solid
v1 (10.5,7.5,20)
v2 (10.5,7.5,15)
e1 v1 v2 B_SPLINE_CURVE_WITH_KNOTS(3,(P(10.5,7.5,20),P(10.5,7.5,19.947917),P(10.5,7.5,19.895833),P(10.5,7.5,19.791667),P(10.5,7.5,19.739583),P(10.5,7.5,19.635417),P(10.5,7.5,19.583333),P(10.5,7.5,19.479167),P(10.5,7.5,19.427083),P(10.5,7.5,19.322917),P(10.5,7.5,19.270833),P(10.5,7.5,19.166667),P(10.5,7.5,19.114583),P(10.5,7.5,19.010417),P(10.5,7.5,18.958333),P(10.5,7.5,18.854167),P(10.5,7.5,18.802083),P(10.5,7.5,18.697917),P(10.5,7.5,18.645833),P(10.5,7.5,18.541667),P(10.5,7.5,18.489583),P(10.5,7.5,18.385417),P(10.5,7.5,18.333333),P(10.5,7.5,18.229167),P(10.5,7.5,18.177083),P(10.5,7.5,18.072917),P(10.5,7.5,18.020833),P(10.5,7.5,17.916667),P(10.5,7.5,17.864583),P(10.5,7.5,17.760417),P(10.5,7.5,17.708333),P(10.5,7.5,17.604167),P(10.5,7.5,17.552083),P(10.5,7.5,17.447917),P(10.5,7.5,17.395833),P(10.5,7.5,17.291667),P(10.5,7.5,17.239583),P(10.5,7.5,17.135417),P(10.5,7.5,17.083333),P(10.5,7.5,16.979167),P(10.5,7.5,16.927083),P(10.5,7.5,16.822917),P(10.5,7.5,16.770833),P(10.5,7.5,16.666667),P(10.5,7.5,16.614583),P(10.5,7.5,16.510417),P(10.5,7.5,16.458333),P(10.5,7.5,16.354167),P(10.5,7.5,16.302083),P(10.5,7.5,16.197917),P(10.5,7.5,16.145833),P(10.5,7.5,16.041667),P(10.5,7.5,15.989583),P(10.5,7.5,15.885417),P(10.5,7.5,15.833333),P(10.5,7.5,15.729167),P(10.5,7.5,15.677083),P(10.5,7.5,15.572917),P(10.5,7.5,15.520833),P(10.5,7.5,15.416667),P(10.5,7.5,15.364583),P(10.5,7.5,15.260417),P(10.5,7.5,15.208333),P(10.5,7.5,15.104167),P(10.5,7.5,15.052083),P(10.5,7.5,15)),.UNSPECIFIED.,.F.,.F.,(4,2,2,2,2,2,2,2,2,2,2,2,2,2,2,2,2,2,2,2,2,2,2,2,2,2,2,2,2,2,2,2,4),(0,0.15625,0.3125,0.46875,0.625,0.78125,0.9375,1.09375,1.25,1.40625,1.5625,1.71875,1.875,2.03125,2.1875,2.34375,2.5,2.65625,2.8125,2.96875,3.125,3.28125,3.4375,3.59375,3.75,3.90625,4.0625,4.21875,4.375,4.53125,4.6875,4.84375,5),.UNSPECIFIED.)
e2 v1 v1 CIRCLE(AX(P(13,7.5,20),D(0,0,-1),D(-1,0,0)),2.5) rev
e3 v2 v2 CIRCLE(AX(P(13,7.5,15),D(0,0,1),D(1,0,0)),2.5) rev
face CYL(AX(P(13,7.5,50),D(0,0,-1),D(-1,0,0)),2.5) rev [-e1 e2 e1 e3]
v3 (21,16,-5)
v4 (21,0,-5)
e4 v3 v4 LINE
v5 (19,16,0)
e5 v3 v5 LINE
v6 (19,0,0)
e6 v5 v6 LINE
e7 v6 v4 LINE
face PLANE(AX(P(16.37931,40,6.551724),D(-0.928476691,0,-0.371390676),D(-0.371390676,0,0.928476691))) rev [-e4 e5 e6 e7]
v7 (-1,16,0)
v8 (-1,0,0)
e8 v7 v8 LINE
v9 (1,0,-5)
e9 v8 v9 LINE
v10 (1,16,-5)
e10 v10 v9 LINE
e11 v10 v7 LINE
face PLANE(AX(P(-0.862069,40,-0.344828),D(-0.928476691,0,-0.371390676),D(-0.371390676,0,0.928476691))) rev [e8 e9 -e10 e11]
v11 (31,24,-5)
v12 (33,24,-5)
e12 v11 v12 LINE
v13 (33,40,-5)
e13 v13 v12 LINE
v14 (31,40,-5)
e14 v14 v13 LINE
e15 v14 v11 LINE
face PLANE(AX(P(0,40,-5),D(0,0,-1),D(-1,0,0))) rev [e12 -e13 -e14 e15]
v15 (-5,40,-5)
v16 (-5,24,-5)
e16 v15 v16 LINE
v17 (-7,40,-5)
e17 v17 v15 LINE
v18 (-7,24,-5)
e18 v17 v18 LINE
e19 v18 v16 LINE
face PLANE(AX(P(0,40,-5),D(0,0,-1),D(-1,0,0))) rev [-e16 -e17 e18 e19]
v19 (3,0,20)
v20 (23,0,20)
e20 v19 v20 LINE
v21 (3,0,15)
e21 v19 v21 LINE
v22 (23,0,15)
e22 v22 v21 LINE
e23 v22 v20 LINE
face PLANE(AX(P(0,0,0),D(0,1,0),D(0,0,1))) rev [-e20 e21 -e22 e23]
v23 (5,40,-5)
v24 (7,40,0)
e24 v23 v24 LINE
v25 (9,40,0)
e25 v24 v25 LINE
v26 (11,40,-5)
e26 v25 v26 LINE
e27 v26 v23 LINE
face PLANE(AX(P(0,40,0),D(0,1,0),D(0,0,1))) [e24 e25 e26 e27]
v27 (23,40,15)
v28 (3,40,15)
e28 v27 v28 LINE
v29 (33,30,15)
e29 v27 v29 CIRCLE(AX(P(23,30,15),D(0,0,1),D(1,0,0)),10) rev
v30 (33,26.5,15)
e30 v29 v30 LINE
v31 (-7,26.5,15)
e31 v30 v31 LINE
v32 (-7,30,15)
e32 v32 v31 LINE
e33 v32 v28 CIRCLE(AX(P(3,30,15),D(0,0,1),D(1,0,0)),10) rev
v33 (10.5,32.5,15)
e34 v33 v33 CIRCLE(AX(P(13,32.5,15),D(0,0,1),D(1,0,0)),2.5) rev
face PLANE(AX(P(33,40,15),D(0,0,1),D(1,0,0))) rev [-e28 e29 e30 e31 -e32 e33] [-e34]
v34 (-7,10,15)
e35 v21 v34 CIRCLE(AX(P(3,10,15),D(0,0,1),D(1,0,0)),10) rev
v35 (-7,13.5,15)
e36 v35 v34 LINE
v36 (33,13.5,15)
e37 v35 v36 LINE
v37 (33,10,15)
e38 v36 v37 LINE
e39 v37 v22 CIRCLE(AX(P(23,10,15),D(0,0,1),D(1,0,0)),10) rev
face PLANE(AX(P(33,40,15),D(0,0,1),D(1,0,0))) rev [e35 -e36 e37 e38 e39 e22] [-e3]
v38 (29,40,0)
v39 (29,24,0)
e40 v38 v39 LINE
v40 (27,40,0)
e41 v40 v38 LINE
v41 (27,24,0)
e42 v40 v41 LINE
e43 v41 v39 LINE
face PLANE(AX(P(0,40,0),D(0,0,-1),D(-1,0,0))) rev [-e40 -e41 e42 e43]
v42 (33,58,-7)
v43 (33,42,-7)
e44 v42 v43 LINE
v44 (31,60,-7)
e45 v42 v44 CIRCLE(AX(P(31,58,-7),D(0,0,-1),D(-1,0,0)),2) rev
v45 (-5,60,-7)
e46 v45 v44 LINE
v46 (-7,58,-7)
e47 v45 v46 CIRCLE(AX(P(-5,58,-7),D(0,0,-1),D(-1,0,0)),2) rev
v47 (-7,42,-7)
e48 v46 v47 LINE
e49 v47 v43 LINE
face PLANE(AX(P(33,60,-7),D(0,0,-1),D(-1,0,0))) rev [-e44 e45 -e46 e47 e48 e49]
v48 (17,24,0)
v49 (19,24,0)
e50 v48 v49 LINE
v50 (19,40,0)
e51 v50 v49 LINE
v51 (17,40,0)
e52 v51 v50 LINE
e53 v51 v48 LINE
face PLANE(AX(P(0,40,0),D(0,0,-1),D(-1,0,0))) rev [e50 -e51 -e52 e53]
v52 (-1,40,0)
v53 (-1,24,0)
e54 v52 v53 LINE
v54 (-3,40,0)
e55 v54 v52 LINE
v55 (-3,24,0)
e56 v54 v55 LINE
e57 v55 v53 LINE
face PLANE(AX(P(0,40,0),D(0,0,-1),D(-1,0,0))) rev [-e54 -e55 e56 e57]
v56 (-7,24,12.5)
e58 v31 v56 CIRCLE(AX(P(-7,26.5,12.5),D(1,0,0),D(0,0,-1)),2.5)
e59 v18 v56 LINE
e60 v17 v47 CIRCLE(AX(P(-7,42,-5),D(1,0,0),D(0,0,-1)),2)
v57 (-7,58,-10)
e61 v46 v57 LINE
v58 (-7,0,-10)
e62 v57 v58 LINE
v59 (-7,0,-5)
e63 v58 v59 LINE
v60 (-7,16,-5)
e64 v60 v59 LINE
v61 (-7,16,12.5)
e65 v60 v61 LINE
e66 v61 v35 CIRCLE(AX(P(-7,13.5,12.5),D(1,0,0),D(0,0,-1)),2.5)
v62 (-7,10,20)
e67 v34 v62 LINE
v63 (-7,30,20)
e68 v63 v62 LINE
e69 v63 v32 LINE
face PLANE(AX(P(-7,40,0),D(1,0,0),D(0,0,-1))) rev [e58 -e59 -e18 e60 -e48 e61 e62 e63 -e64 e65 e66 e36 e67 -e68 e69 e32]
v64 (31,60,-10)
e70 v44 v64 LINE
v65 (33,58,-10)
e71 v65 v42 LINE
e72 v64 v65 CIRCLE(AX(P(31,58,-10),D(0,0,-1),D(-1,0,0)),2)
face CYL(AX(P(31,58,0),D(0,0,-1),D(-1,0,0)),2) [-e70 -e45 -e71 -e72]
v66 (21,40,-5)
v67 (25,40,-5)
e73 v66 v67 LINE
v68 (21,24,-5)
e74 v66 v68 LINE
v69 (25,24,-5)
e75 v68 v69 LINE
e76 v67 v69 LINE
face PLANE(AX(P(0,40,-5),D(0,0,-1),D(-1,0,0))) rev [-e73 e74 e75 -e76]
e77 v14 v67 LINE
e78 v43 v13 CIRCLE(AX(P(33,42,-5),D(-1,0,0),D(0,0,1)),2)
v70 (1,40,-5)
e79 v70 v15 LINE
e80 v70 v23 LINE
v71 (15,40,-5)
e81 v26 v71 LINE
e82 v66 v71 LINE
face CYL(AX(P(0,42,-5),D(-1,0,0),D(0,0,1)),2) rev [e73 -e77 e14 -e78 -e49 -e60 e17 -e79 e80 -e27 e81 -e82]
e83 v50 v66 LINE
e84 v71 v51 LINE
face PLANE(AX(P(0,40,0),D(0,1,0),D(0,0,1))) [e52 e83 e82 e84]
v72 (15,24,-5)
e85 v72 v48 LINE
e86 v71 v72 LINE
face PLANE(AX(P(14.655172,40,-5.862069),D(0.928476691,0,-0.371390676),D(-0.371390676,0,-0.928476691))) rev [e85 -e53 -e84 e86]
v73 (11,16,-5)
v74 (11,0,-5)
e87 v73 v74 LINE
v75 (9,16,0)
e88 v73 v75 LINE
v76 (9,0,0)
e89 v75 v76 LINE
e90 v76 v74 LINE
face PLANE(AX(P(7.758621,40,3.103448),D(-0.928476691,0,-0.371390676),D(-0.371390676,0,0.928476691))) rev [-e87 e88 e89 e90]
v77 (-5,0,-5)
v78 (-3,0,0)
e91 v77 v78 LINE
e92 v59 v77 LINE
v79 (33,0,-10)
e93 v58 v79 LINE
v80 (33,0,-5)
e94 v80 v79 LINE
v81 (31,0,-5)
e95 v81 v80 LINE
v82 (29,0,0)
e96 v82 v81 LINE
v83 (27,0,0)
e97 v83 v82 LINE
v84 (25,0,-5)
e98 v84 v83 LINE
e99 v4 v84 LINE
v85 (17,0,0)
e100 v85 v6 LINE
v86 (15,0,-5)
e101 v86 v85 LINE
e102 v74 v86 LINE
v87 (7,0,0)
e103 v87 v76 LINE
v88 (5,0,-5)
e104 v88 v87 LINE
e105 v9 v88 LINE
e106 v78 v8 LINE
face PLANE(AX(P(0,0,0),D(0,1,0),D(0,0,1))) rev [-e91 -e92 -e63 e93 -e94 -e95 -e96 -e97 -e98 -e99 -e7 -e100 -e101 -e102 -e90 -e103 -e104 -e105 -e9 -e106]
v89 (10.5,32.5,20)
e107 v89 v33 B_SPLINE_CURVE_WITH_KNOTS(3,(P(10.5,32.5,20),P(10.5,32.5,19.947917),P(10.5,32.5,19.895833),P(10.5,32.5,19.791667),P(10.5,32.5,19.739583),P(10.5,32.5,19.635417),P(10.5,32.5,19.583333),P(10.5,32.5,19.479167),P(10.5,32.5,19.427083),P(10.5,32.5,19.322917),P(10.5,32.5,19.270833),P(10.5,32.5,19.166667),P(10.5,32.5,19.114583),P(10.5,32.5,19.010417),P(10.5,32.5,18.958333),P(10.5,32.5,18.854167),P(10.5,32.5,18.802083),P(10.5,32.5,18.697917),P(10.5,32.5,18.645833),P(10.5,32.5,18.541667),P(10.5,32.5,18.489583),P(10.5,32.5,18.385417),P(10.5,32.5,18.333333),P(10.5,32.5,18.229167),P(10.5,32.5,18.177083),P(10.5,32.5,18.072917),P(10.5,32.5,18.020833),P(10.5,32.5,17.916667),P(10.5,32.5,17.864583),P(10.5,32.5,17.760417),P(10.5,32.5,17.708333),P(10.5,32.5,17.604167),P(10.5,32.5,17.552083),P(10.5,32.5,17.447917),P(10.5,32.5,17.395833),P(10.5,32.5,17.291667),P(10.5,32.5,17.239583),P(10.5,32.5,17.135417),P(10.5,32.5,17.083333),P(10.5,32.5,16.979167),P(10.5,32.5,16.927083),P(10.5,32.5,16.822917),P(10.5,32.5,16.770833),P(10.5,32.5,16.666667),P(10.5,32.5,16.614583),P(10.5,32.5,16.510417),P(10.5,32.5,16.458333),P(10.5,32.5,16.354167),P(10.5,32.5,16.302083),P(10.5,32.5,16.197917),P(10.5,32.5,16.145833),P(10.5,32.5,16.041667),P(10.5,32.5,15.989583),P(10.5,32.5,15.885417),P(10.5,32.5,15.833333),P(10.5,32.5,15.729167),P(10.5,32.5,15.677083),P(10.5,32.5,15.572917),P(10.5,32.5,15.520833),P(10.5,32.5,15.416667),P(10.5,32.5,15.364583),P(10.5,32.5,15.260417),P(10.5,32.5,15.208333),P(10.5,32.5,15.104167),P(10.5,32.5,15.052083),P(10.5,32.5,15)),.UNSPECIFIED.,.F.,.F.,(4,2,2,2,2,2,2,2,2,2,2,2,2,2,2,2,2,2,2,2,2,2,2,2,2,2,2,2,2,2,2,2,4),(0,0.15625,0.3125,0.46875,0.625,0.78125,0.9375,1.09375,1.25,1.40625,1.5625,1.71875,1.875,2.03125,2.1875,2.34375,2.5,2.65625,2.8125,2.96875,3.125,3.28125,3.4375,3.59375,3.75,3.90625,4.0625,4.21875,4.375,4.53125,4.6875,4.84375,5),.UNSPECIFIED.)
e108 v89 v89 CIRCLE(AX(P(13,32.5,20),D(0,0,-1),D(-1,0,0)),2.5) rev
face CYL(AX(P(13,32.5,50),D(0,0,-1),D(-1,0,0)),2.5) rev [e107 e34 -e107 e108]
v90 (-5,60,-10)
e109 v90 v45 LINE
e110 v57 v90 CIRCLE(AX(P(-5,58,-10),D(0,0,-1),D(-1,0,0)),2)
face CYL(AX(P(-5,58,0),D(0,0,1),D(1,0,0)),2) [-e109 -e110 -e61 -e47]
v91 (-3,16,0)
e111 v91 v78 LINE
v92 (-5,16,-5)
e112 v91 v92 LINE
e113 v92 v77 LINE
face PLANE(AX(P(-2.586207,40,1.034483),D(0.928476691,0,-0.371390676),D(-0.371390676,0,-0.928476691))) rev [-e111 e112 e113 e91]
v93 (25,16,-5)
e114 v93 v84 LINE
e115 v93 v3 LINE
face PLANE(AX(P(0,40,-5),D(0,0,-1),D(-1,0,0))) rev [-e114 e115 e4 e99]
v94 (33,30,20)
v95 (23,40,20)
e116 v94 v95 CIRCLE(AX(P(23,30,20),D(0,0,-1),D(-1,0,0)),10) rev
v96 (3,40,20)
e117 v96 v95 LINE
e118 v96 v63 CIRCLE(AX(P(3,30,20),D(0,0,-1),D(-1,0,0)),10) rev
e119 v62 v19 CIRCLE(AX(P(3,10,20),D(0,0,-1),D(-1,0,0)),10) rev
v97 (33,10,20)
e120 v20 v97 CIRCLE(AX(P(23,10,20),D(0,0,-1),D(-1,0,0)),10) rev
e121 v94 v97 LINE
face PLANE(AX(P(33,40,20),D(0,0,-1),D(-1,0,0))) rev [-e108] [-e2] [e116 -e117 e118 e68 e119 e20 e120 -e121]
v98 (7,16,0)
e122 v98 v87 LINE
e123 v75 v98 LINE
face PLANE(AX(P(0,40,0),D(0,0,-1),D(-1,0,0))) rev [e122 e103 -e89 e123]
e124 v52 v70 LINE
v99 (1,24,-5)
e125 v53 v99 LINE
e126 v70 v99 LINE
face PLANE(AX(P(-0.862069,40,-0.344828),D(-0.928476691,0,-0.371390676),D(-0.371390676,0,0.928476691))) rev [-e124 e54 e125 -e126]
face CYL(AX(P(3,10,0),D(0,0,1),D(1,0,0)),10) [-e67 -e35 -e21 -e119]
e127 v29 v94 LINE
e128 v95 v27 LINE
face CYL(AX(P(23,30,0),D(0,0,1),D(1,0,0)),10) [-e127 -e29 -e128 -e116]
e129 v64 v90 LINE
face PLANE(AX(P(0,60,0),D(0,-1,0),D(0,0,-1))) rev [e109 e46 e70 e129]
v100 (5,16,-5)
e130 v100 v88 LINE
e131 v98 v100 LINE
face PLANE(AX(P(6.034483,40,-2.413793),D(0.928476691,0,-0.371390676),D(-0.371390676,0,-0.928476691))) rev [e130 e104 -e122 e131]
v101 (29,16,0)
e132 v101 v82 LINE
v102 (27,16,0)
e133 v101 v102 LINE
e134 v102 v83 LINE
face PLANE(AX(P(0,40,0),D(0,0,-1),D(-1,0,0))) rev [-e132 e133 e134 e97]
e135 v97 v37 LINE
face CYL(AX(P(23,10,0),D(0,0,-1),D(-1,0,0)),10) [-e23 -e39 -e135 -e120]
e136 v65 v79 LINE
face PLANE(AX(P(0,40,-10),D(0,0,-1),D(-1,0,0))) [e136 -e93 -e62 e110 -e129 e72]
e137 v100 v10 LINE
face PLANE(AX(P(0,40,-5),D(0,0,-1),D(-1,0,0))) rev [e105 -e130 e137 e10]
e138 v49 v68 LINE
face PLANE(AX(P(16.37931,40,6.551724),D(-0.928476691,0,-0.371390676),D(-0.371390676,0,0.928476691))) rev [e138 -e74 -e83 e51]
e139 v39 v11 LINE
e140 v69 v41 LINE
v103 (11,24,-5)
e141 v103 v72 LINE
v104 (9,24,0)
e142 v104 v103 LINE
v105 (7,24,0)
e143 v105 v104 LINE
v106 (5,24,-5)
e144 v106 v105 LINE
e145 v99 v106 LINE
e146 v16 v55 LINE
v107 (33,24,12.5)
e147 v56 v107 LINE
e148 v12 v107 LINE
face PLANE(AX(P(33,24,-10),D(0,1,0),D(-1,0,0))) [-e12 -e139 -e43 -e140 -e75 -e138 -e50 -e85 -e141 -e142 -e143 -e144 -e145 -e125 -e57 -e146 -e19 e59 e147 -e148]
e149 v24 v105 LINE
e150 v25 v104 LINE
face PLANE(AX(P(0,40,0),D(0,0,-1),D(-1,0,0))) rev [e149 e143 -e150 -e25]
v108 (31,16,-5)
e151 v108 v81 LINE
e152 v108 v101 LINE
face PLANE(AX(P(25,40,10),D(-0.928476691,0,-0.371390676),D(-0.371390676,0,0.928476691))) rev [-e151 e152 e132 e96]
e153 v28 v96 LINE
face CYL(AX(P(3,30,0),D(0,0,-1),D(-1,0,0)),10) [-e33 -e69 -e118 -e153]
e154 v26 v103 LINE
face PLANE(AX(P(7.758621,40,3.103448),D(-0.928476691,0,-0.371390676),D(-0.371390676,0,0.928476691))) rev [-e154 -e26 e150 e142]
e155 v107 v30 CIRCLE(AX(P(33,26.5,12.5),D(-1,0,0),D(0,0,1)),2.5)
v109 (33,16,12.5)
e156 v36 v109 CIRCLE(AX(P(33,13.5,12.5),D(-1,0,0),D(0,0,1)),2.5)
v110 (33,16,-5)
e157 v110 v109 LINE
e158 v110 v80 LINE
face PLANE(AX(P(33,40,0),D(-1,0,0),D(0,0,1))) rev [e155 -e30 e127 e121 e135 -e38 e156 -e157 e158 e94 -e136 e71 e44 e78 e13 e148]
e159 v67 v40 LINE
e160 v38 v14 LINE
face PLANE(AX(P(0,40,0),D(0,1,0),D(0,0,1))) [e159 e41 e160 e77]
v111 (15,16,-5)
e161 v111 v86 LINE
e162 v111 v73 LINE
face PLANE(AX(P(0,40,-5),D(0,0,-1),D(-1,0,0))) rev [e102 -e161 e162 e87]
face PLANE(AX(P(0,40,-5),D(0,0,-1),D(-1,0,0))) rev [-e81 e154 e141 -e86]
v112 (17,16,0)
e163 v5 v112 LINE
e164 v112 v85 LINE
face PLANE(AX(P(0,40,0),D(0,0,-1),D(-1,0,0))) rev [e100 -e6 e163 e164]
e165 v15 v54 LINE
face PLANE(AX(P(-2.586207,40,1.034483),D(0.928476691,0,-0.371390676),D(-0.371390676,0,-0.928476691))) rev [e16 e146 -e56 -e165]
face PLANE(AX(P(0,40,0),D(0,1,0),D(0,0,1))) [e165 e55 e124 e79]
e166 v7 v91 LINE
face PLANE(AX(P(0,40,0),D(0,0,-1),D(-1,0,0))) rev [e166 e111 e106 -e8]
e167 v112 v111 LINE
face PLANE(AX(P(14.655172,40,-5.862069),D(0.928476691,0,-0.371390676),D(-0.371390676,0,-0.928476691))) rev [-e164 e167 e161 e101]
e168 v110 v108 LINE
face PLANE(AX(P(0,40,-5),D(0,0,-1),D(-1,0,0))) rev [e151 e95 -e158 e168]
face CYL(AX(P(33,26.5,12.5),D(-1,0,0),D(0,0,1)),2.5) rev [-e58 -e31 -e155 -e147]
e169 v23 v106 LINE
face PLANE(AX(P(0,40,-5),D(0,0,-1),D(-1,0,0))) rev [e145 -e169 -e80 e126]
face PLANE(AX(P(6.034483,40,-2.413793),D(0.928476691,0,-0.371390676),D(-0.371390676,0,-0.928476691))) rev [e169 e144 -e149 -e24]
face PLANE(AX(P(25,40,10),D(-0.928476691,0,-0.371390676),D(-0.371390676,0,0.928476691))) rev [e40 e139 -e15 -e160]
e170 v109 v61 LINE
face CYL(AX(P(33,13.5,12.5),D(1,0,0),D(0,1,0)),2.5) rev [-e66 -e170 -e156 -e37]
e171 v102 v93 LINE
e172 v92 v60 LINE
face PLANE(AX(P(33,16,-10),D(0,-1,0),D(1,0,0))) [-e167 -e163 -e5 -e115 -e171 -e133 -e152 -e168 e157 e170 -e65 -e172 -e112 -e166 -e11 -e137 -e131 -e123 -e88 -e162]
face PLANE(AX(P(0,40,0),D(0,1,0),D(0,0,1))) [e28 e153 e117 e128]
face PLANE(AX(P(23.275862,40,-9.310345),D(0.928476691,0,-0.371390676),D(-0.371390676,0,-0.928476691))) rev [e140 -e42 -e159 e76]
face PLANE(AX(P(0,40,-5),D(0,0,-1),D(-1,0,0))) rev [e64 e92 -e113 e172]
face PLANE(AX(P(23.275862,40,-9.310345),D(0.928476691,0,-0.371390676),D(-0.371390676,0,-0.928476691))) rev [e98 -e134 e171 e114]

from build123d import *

# Parameters (mm, degrees)
BOSS_EXTRUDE1_DEPTH      = 40
SKETCH2_W                = 40
SKETCH2_H                = 3
BOSS_EXTRUDE2_DEPTH      = 60
BOSS_EXTRUDE3_DEPTH      = 15
BOSS_EXTRUDE3_DEPTH_BACK = 10
SKETCH3_W                = 40
SKETCH3_H                = 8
SKETCH4_W                = 40
SKETCH4_H                = 5
BOSS_EXTRUDE4_DEPTH      = 40
SKETCH5_R                = 2.5
CUT_EXTRUDE1_DEPTH       = 40
FILLET1_R                = 10
FILLET2_R                = 2.5
FILLET3_START            = -7
FILLET3_DEPTH            = 40
FILLET4_R                = 2


with BuildPart() as part:
    # Sketch1 → Boss-Extrude1 (new body)
    with BuildSketch(Plane(origin=(0, 0, 0), x_dir=(1, 0, 0), z_dir=(0, 1, 0))):
        Polygon((-7, 10), (-7, 5), (-5, 5), (-3, 0), (-1, 0), (1, 5), (5, 5), (7, 0), (9, 0), (11, 5), (15, 5), (17, 0), (19, 0), (21, 5), (25, 5), (27, 0), (29, 0), (31, 5), (33, 5), (33, 10), (31.5, 10), align=None)
    extrude(amount=BOSS_EXTRUDE1_DEPTH)

    # Sketch2 → Boss-Extrude2 (add)
    with BuildSketch(Plane(origin=(0, 0, 0), x_dir=(1, 0, 0), z_dir=(0, 1, 0))):
        with Locations((13, 8.5)):
            Rectangle(SKETCH2_W, SKETCH2_H)
    extrude(amount=BOSS_EXTRUDE2_DEPTH)

    # Sketch3 → Boss-Extrude3 (add, two sides: drawn at the far end of the back side and taken through both)
    with BuildSketch(Plane.XY.offset(-BOSS_EXTRUDE3_DEPTH_BACK)):
        with Locations((13, 20)):
            Rectangle(SKETCH3_W, SKETCH3_H)
    extrude(amount=BOSS_EXTRUDE3_DEPTH + BOSS_EXTRUDE3_DEPTH_BACK)

    # Sketch4 → Boss-Extrude4 (add)
    with BuildSketch(Plane(origin=(0, 0, 0), x_dir=(1, 0, 0), z_dir=(0, 1, 0))):
        with Locations((13, -17.5)):
            Rectangle(SKETCH4_W, SKETCH4_H)
    extrude(amount=BOSS_EXTRUDE4_DEPTH)

    # Sketch5 → Cut-Extrude1 (cut)
    with BuildSketch(Plane.XY.offset(10)):
        with Locations(Location((13, 32.5, 0), (0, 0, 180))):
            Circle(SKETCH5_R)
        with Locations(Location((13, 7.5, 0), (0, 0, 180))):
            Circle(SKETCH5_R)
    extrude(amount=CUT_EXTRUDE1_DEPTH, mode=Mode.SUBTRACT)

    # Fillet1
    fillet1_edges = [part.edges().sort_by_distance(p)[0] for p in [
        (-7, 0, 17.5),
        (33, 0, 17.5),
        (33, 40, 17.5),
        (-7, 40, 17.5),
    ]]
    fillet(fillet1_edges, radius=FILLET1_R)

    # Fillet2
    fillet2_edges = [part.edges().sort_by_distance(p)[0] for p in [
        (13, 16, 15),
        (13, 24, 15),
    ]]
    fillet(fillet2_edges, radius=FILLET2_R)

    # Fillet3: read off the stored shape, not the designer's step
    # Fillet3 outline → Fillet3 (add)
    with BuildSketch(Plane.YZ.offset(FILLET3_START)):
        with BuildLine():
            Line((40, -7), (42, -7))
            ThreePointArc((42, -7), (40.585786438, -6.414213562), (40, -5))
            Line((40, -5), (40, -7))
        make_face()
    extrude(amount=FILLET3_DEPTH)

    # Fillet4
    fillet4_edges = [part.edges().sort_by_distance(p)[0] for p in [
        (-7, 60, -8.5),
        (33, 60, -8.5),
    ]]
    fillet(fillet4_edges, radius=FILLET4_R)


solid = part.part
